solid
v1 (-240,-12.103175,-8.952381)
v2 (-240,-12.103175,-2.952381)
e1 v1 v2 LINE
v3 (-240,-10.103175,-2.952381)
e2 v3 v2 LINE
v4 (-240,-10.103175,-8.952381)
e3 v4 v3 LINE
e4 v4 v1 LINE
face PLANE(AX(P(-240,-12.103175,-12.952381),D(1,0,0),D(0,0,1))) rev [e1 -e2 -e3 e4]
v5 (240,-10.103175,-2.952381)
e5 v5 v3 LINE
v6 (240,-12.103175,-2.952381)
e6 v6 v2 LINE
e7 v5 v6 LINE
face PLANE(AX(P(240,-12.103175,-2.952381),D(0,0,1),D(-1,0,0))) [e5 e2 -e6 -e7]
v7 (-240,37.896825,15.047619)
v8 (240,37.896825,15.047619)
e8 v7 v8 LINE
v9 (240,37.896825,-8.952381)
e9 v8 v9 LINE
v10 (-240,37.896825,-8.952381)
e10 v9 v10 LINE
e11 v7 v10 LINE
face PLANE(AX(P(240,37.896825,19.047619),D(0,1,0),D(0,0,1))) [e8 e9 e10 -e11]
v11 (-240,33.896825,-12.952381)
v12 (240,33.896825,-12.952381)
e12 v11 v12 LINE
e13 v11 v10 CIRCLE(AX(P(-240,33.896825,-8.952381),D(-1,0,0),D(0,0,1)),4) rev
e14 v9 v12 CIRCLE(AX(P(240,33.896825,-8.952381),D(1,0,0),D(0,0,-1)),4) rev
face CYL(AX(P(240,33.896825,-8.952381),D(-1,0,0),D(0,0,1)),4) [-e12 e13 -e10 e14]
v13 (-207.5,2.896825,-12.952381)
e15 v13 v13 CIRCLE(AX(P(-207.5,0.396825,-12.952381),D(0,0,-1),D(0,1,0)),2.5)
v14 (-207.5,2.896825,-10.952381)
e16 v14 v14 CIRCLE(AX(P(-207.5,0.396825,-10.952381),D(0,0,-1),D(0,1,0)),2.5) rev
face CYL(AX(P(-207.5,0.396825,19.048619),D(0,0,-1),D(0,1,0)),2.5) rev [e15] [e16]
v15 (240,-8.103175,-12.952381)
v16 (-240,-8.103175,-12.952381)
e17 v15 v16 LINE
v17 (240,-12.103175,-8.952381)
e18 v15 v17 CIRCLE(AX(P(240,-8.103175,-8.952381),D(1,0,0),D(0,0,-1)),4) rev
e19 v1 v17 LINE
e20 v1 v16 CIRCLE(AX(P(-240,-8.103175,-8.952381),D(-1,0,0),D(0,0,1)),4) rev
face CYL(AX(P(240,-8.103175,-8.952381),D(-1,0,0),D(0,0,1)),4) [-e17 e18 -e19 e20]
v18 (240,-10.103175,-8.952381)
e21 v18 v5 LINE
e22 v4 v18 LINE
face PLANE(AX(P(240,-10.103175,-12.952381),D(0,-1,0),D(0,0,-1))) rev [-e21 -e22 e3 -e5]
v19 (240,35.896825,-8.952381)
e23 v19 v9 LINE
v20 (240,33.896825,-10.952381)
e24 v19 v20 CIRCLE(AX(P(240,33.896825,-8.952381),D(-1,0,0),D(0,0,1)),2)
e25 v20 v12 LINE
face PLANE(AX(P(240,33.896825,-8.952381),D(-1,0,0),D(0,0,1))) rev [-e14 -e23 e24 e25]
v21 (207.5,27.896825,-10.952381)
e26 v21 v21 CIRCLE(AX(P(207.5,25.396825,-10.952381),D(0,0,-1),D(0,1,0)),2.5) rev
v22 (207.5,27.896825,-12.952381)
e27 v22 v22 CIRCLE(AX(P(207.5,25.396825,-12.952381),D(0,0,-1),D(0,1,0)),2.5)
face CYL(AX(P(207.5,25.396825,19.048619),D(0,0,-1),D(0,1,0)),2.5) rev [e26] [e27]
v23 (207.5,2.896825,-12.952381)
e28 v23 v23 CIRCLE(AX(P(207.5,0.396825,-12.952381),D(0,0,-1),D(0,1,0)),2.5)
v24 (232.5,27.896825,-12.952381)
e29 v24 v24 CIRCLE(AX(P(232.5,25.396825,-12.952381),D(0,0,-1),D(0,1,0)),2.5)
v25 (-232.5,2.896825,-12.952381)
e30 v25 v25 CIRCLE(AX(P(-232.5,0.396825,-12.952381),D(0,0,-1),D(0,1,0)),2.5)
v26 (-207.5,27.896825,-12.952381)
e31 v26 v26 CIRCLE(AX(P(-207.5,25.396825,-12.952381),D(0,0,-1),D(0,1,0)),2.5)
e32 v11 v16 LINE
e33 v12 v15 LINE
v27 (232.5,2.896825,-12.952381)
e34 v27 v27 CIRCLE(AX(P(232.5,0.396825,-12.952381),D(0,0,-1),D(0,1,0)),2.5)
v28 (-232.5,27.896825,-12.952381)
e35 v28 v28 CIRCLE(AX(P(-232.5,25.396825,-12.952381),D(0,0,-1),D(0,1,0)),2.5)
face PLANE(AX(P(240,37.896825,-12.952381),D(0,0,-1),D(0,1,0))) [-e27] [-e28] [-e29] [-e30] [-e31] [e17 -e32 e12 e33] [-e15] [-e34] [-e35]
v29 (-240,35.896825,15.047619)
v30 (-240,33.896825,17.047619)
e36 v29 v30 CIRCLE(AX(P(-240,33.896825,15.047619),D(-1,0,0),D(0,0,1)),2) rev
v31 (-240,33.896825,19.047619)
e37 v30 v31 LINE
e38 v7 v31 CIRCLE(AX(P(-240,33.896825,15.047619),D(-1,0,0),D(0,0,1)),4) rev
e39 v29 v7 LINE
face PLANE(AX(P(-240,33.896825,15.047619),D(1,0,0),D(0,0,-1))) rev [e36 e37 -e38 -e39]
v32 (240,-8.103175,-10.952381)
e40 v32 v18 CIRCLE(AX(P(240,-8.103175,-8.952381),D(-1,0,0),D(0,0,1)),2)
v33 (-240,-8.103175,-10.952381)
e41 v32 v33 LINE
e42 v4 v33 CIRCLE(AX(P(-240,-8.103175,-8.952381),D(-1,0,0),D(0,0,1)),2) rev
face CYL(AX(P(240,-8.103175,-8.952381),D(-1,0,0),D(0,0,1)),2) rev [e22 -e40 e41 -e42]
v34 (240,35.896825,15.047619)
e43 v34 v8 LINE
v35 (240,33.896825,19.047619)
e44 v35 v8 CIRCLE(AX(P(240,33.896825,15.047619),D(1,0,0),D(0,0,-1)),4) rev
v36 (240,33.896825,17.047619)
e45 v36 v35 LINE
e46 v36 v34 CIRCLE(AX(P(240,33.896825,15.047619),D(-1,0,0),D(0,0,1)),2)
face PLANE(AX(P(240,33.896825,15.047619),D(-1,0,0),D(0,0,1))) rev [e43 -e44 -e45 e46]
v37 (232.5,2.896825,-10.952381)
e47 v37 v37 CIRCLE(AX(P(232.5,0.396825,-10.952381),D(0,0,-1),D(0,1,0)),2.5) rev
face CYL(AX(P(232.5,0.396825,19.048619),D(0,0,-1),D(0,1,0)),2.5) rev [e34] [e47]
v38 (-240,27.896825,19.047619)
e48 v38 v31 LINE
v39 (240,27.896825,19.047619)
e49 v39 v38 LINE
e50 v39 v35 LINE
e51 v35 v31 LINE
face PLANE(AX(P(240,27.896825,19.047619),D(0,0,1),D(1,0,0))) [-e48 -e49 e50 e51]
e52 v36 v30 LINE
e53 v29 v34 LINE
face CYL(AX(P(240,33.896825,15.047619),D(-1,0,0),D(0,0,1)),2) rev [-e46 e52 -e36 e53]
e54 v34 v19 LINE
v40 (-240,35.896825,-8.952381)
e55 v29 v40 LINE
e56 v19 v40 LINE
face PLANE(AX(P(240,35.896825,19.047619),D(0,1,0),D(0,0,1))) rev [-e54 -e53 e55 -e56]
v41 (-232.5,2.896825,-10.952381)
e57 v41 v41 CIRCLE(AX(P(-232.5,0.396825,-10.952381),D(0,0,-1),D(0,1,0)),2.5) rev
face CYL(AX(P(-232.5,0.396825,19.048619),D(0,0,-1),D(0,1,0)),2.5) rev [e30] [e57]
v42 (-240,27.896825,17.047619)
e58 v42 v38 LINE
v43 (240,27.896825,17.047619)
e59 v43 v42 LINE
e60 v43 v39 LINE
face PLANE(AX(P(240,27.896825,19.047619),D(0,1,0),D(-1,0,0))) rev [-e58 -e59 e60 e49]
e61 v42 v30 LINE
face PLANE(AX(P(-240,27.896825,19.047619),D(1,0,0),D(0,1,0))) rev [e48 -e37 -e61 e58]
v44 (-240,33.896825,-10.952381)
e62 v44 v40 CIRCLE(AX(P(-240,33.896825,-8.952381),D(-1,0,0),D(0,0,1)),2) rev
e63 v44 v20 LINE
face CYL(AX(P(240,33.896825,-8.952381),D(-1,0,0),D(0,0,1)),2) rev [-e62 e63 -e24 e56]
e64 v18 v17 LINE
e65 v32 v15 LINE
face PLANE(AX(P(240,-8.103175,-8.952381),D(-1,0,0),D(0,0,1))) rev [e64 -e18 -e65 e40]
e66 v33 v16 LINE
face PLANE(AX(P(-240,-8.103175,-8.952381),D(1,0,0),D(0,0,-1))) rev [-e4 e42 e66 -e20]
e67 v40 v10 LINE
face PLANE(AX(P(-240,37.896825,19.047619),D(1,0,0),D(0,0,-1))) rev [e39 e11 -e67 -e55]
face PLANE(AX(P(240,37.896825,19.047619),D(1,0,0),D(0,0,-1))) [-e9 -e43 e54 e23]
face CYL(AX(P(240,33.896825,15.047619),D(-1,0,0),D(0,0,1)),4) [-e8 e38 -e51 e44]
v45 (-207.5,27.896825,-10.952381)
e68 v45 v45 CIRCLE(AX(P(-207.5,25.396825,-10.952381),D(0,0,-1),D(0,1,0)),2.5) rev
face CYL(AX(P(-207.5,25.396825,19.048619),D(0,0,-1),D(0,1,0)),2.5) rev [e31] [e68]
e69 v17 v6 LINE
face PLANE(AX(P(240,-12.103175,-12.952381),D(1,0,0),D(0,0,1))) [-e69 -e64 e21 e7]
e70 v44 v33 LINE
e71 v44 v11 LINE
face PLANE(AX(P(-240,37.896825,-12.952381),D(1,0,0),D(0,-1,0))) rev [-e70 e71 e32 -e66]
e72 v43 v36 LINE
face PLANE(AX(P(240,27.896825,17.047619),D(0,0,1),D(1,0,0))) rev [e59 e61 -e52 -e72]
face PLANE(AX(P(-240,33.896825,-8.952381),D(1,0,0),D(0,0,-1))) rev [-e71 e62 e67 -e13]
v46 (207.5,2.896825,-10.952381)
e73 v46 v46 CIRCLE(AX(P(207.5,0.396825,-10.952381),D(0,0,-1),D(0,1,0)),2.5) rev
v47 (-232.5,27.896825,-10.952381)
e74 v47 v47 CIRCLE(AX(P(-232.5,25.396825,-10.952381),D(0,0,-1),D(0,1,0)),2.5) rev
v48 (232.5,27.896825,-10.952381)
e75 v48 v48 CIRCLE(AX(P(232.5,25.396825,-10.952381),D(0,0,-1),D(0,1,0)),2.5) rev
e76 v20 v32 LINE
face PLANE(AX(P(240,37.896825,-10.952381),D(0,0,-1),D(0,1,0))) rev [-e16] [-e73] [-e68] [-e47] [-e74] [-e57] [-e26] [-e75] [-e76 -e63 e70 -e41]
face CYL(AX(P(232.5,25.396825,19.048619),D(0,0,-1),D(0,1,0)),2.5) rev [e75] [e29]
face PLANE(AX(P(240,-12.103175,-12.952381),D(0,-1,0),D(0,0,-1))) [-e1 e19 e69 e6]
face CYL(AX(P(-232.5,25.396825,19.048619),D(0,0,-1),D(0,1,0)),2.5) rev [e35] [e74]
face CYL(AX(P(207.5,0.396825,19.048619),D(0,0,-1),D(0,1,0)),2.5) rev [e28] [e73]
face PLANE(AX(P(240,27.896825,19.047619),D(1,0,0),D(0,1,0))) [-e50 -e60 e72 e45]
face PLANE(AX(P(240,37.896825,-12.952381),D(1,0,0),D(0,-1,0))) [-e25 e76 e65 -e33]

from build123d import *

# Parameters (mm, degrees)
EXTRUDE_1_DEPTH       = 240
SHEET_START           = -240
SHEET_METAL_1_DEPTH   = 480
SHEET_METAL_1_2_DEPTH = 480
CUT_EXTRUDE_1_REACH   = 247.072
SKETCH_7_R            = 2.5


# Read off the part's stored shape, not the designer's step: Преобразовать-Твердое тело1
with BuildPart() as part:
    # Sketch 1 → Вытянуть-Тонкостенный1 (new, symmetric)
    with BuildSketch(Plane(origin=(0, 0, 0), x_dir=(0, 0, -1), z_dir=(1, 0, 0))):
        Polygon((-19.047619048, 27.896825397), (-19.047619048, 37.896825397), (12.952380952, 37.896825397), (12.952380952, -12.103174603), (2.952380952, -12.103174603), (2.952380952, -10.103174603), (10.952380952, -10.103174603), (10.952380952, 35.896825397), (-17.047619048, 35.896825397), (-17.047619048, 27.896825397), align=None)
    extrude(amount=EXTRUDE_1_DEPTH, both=True)

    # Sheet Metal 1 outline → Sheet Metal 1 (cut)
    with BuildSketch(Plane.YZ.offset(SHEET_START)):
        with BuildLine():
            Line((-12.103174603, -12.952380952), (-8.103174603, -12.952380952))
            ThreePointArc((-8.103174603, -12.952380952), (-10.931601728, -11.780808077), (-12.103174603, -8.952380952))
            Line((-12.103174603, -8.952380952), (-12.103174603, -12.952380952))
        make_face()
        with BuildLine():
            ThreePointArc((33.896825397, 19.047619048), (36.725252521, 17.876046172), (37.896825397, 15.047619048))
            Line((37.896825397, 15.047619048), (37.896825397, 19.047619048))
            Line((37.896825397, 19.047619048), (33.896825397, 19.047619048))
        make_face()
        with BuildLine():
            ThreePointArc((37.896825397, -8.952380952), (36.725252522, -11.780808077), (33.896825397, -12.952380952))
            Line((33.896825397, -12.952380952), (37.896825397, -12.952380952))
            Line((37.896825397, -12.952380952), (37.896825397, -8.952380952))
        make_face()
    extrude(amount=SHEET_METAL_1_DEPTH, mode=Mode.SUBTRACT)

    # Sheet Metal 1 2 outline → Sheet Metal 1 2 (add)
    with BuildSketch(Plane.YZ.offset(SHEET_START)):
        with BuildLine():
            Line((-10.103174603, -10.952380952), (-8.103174603, -10.952380952))
            ThreePointArc((-8.103174603, -10.952380952), (-9.517388166, -10.366594515), (-10.103174603, -8.952380952))
            Line((-10.103174603, -8.952380952), (-10.103174603, -10.952380952))
        make_face()
        with BuildLine():
            ThreePointArc((33.896825397, 17.047619048), (35.311038959, 16.46183261), (35.896825397, 15.047619048))
            Line((35.896825397, 15.047619048), (35.896825397, 17.047619048))
            Line((35.896825397, 17.047619048), (33.896825397, 17.047619048))
        make_face()
        with BuildLine():
            ThreePointArc((35.896825397, -8.952380952), (35.31103896, -10.366594515), (33.896825397, -10.952380952))
            Line((33.896825397, -10.952380952), (35.896825397, -10.952380952))
            Line((35.896825397, -10.952380952), (35.896825397, -8.952380952))
        make_face()
    extrude(amount=SHEET_METAL_1_2_DEPTH)

    # Эскиз7 → Вырез-Вытянуть1 (cut, up to next)
    with BuildSketch(Plane(origin=(0, 0, -12.952380952), x_dir=(-1, 0, 0), z_dir=(0, 0, -1)), mode=Mode.PRIVATE) as cut_extrude_1_sk1:
        with Locations(Location((-207.5, 25.396825397, 0), (0, 0, 90))):
            Circle(SKETCH_7_R)
    cut_extrude_1_tool1 = extrude(cut_extrude_1_sk1.sketch, amount=-CUT_EXTRUDE_1_REACH, mode=Mode.PRIVATE) & part.part
    # Эскиз7 → Вырез-Вытянуть1 (cut, up to next)
    with BuildSketch(Plane(origin=(0, 0, -12.952380952), x_dir=(-1, 0, 0), z_dir=(0, 0, -1)), mode=Mode.PRIVATE) as cut_extrude_1_sk2:
        with Locations(Location((-232.5, 25.396825397, 0), (0, 0, 90))):
            Circle(SKETCH_7_R)
    cut_extrude_1_tool2 = extrude(cut_extrude_1_sk2.sketch, amount=-CUT_EXTRUDE_1_REACH, mode=Mode.PRIVATE) & part.part
    # Эскиз7 → Вырез-Вытянуть1 (cut, up to next)
    with BuildSketch(Plane(origin=(0, 0, -12.952380952), x_dir=(-1, 0, 0), z_dir=(0, 0, -1)), mode=Mode.PRIVATE) as cut_extrude_1_sk3:
        with Locations(Location((-232.5, 0.396825397, 0), (0, 0, 90))):
            Circle(SKETCH_7_R)
    cut_extrude_1_tool3 = extrude(cut_extrude_1_sk3.sketch, amount=-CUT_EXTRUDE_1_REACH, mode=Mode.PRIVATE) & part.part
    # Эскиз7 → Вырез-Вытянуть1 (cut, up to next)
    with BuildSketch(Plane(origin=(0, 0, -12.952380952), x_dir=(-1, 0, 0), z_dir=(0, 0, -1)), mode=Mode.PRIVATE) as cut_extrude_1_sk4:
        with Locations(Location((-207.5, 0.396825397, 0), (0, 0, 90))):
            Circle(SKETCH_7_R)
    cut_extrude_1_tool4 = extrude(cut_extrude_1_sk4.sketch, amount=-CUT_EXTRUDE_1_REACH, mode=Mode.PRIVATE) & part.part
    # Эскиз7 → Вырез-Вытянуть1 (cut, up to next)
    with BuildSketch(Plane(origin=(0, 0, -12.952380952), x_dir=(-1, 0, 0), z_dir=(0, 0, -1)), mode=Mode.PRIVATE) as cut_extrude_1_sk5:
        with Locations(Location((232.5, 25.396825397, 0), (0, 0, 90))):
            Circle(SKETCH_7_R)
    cut_extrude_1_tool5 = extrude(cut_extrude_1_sk5.sketch, amount=-CUT_EXTRUDE_1_REACH, mode=Mode.PRIVATE) & part.part
    # Эскиз7 → Вырез-Вытянуть1 (cut, up to next)
    with BuildSketch(Plane(origin=(0, 0, -12.952380952), x_dir=(-1, 0, 0), z_dir=(0, 0, -1)), mode=Mode.PRIVATE) as cut_extrude_1_sk6:
        with Locations(Location((207.5, 25.396825397, 0), (0, 0, 90))):
            Circle(SKETCH_7_R)
    cut_extrude_1_tool6 = extrude(cut_extrude_1_sk6.sketch, amount=-CUT_EXTRUDE_1_REACH, mode=Mode.PRIVATE) & part.part
    # Эскиз7 → Вырез-Вытянуть1 (cut, up to next)
    with BuildSketch(Plane(origin=(0, 0, -12.952380952), x_dir=(-1, 0, 0), z_dir=(0, 0, -1)), mode=Mode.PRIVATE) as cut_extrude_1_sk7:
        with Locations(Location((207.5, 0.396825397, 0), (0, 0, 90))):
            Circle(SKETCH_7_R)
    cut_extrude_1_tool7 = extrude(cut_extrude_1_sk7.sketch, amount=-CUT_EXTRUDE_1_REACH, mode=Mode.PRIVATE) & part.part
    # Эскиз7 → Вырез-Вытянуть1 (cut, up to next)
    with BuildSketch(Plane(origin=(0, 0, -12.952380952), x_dir=(-1, 0, 0), z_dir=(0, 0, -1)), mode=Mode.PRIVATE) as cut_extrude_1_sk8:
        with Locations(Location((232.5, 0.396825397, 0), (0, 0, 90))):
            Circle(SKETCH_7_R)
    cut_extrude_1_tool8 = extrude(cut_extrude_1_sk8.sketch, amount=-CUT_EXTRUDE_1_REACH, mode=Mode.PRIVATE) & part.part
    add(cut_extrude_1_tool1.solids().sort_by_distance((207.5, 25.396825, -12.952381))[0], mode=Mode.SUBTRACT)
    add(cut_extrude_1_tool2.solids().sort_by_distance((232.5, 25.396825, -12.952381))[0], mode=Mode.SUBTRACT)
    add(cut_extrude_1_tool3.solids().sort_by_distance((232.5, 0.396825, -12.952381))[0], mode=Mode.SUBTRACT)
    add(cut_extrude_1_tool4.solids().sort_by_distance((207.5, 0.396825, -12.952381))[0], mode=Mode.SUBTRACT)
    add(cut_extrude_1_tool5.solids().sort_by_distance((-232.5, 25.396825, -12.952381))[0], mode=Mode.SUBTRACT)
    add(cut_extrude_1_tool6.solids().sort_by_distance((-207.5, 25.396825, -12.952381))[0], mode=Mode.SUBTRACT)
    add(cut_extrude_1_tool7.solids().sort_by_distance((-207.5, 0.396825, -12.952381))[0], mode=Mode.SUBTRACT)
    add(cut_extrude_1_tool8.solids().sort_by_distance((-232.5, 0.396825, -12.952381))[0], mode=Mode.SUBTRACT)


solid = part.part
